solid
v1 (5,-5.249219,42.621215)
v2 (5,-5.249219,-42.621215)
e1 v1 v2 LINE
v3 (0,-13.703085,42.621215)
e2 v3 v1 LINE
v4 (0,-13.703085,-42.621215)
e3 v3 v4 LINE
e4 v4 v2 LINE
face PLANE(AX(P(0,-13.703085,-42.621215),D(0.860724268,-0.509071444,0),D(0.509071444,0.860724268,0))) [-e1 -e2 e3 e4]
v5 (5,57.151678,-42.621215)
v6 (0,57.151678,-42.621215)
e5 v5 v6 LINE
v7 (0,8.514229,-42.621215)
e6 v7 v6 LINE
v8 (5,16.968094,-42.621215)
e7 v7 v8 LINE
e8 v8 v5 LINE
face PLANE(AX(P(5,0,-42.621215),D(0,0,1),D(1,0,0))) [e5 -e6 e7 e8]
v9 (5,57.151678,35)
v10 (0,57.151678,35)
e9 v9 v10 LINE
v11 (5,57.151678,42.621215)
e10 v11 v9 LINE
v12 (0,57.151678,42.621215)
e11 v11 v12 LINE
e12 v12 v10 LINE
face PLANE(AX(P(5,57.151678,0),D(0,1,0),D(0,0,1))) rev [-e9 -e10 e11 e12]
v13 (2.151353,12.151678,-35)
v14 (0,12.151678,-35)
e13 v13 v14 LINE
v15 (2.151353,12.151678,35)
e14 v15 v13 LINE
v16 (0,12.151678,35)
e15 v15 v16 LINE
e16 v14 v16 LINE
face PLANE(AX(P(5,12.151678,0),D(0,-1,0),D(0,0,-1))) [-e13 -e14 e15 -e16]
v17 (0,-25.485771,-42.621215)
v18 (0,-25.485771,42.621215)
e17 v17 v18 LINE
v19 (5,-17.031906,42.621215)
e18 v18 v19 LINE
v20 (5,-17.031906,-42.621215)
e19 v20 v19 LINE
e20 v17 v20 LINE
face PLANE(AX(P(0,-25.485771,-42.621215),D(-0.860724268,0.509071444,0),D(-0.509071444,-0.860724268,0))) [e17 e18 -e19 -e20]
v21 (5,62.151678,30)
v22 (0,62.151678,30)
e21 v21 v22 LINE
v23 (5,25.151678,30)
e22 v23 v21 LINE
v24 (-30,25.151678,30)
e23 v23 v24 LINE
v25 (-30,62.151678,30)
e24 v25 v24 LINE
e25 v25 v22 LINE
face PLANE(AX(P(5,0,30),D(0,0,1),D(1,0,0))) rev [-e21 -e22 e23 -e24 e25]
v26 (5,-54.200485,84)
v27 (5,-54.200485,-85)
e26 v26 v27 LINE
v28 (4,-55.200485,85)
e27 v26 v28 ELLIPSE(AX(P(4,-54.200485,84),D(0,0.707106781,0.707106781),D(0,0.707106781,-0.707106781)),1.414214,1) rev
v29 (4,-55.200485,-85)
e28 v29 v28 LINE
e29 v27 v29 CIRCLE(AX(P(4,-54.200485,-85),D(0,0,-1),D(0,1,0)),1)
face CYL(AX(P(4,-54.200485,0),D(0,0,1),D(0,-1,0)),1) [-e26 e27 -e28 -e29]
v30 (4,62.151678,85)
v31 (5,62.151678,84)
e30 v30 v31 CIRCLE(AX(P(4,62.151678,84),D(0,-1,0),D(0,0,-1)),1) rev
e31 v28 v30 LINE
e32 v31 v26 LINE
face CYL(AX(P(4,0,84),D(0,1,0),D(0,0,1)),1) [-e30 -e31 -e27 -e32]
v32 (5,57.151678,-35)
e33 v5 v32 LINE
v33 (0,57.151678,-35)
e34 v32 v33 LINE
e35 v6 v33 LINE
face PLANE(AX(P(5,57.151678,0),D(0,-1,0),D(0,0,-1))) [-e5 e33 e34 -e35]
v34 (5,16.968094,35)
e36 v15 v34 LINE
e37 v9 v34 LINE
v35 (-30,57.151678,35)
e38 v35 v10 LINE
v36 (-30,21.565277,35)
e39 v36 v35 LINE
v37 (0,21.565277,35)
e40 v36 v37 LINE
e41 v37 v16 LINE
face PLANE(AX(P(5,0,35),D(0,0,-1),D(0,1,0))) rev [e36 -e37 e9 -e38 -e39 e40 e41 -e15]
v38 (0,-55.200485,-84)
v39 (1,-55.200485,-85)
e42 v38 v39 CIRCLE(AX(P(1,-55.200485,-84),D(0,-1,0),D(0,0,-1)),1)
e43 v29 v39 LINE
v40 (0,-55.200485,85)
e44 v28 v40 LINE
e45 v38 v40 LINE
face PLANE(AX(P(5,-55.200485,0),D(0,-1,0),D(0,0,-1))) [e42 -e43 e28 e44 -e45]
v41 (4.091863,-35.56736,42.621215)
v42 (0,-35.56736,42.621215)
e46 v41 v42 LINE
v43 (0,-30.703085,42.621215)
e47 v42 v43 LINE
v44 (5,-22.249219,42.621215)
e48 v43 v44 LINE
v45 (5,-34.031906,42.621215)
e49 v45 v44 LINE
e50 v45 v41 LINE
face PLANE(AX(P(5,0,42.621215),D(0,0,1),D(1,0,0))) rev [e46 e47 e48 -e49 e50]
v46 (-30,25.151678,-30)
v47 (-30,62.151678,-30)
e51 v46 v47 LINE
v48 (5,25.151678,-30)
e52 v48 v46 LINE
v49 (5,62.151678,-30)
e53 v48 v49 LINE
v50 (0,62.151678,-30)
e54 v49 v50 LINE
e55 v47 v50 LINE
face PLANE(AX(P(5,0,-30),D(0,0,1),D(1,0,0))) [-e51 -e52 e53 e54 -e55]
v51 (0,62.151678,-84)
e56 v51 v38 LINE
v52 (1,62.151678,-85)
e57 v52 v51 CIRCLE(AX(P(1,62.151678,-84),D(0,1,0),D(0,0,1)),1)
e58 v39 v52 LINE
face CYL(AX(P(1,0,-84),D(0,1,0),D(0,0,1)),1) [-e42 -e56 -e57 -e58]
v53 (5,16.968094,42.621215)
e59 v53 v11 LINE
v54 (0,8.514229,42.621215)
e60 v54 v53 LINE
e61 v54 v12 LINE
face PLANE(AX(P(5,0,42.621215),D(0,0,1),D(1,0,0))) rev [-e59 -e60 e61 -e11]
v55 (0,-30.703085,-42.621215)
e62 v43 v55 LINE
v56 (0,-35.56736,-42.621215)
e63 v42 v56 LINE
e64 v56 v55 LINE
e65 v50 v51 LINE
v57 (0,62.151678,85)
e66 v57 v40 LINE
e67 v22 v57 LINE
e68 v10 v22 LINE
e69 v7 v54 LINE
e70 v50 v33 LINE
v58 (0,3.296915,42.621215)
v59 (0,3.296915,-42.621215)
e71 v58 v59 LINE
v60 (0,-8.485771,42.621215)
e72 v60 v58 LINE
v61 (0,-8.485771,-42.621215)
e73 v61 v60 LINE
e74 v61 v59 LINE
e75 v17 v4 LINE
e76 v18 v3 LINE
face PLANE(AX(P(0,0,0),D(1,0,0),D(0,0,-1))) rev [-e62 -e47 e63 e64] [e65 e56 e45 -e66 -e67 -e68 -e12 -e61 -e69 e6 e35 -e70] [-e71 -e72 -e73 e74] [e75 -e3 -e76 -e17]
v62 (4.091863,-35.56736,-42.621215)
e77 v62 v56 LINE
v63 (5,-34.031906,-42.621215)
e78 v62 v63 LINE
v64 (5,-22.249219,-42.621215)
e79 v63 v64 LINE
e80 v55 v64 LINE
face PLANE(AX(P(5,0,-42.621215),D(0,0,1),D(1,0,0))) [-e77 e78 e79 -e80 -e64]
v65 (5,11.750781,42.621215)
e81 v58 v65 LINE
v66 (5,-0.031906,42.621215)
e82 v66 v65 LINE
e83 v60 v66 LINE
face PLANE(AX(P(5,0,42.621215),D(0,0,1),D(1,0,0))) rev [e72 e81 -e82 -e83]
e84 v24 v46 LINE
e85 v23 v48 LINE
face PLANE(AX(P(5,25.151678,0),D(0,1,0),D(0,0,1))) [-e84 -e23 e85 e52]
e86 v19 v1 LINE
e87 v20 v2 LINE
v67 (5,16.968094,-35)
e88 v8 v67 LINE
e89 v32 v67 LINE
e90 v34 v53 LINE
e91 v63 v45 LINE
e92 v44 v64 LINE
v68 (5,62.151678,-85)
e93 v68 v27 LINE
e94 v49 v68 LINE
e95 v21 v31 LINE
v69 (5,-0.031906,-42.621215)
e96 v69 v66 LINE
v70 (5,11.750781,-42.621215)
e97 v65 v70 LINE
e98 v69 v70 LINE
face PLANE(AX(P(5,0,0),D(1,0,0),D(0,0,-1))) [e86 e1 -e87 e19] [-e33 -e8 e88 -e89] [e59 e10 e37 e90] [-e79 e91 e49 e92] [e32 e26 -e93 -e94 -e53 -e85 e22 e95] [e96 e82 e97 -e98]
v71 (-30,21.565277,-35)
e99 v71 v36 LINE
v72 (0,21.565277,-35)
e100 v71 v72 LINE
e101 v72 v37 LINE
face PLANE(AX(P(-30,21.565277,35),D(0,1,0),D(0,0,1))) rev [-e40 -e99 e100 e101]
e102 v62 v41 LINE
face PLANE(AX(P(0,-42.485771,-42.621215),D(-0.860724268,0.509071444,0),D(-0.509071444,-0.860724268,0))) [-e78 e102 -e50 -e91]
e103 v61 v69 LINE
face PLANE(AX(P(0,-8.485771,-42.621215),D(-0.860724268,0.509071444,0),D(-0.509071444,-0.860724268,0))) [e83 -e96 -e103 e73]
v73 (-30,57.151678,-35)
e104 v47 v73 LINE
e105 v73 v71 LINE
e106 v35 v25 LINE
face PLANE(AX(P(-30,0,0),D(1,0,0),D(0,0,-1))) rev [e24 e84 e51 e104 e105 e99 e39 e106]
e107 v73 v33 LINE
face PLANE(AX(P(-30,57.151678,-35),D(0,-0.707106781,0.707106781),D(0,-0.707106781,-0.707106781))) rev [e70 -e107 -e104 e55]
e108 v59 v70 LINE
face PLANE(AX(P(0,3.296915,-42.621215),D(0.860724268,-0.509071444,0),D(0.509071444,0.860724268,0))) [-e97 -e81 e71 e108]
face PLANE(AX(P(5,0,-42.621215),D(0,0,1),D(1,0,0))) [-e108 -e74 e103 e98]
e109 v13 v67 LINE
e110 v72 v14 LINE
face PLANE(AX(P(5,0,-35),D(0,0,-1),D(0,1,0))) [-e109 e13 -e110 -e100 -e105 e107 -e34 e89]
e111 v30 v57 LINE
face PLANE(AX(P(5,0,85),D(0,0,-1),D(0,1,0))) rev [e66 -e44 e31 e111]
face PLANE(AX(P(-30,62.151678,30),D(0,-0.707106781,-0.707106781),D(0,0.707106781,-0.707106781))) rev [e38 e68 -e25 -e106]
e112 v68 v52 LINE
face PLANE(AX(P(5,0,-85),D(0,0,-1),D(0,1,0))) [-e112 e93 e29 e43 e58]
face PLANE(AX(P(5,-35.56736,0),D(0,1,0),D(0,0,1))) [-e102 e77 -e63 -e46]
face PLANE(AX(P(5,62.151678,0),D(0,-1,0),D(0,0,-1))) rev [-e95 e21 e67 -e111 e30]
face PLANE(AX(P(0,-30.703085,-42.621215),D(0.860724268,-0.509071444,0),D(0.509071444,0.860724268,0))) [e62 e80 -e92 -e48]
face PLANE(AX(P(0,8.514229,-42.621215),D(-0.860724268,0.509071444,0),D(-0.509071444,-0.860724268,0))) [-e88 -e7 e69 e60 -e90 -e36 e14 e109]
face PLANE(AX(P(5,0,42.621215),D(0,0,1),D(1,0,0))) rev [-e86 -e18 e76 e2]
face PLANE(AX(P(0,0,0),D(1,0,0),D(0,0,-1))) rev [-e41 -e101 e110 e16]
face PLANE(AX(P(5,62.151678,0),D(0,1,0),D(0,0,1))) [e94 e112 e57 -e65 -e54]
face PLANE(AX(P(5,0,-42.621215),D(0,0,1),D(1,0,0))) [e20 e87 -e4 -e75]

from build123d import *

# Parameters (mm, degrees)
BOSS_EXTRU_3_DEPTH             = 5
ESQUISSE6_W                    = 85.242430228
ESQUISSE6_H                    = 5.217313119
R_P_TITION_LIN_AIRE1_COUNT     = 3
R_P_TITION_LIN_AIRE1_PITCH     = 17
R_P_TITION_LIN_AIRE1_COL_COUNT = 2
R_P_TITION_LIN_AIRE1_COL_PITCH = 17
CONG_1_R                       = 1
BOSS_EXTRU_5_DEPTH             = 30


with BuildPart() as part:
    # Esquisse2 → Boss.-Extru.3 (new body)
    with BuildSketch(Plane(origin=(0, 0, 0), x_dir=(0, 0, -1), z_dir=(1, 0, 0))):
        Polygon((85, 62.151677918), (30, 62.151677918), (30, 25.151677918), (0, 25.151677918), (0, 12.151677918), (35, 12.151677918), (35, 57.151677918), (42.621215114, 57.151677918), (42.621215114, -35.567359792), (0, -35.567359792), (0, -55.200485129), (85, -55.200485129), align=None)
    boss_extru_3 = extrude(amount=BOSS_EXTRU_3_DEPTH)

    # Symétrie1: Boss.-Extru.3 across plane
    add(boss_extru_3.mirror(Plane.XY))

    # Balayage5: sweep along a path in Esquisse5
    with BuildLine(Plane.XY.offset(-42.621215114)) as balayage5_path:
        Line((0, -30.703084538), (5, -22.249219394))
    # Esquisse6 → Balayage5 (sweep)
    with BuildSketch(Plane(origin=(0, 0, 0), x_dir=(0, 0, -1), z_dir=(1, 0, 0))):
        with Locations((0, -28.094427979)):
            Rectangle(ESQUISSE6_W, ESQUISSE6_H)
    balayage5 = sweep(path=balayage5_path.line)

    # Répétition linéaire1: Balayage5 ×3
    with Locations(*[(0, i * R_P_TITION_LIN_AIRE1_PITCH, 0) for i in range(1, R_P_TITION_LIN_AIRE1_COUNT)]):
        add(balayage5)

    # Répétition linéaire1 col: Balayage5 ×2
    with Locations(*[(0, -i * R_P_TITION_LIN_AIRE1_COL_PITCH, 0) for i in range(1, R_P_TITION_LIN_AIRE1_COL_COUNT)]):
        add(balayage5)

    # Congé1
    cong_1_edges = [part.edges().sort_by_distance(p)[0] for p in [
        (0, 3.475596394, -85),
        (5, -55.200485129, 0),
        (5, 3.475596394, 85),
    ]]
    fillet(cong_1_edges, radius=CONG_1_R)

    # Esquisse8 → Boss.-Extru.5 (add)
    with BuildSketch(Plane.ZY):
        Polygon((-30, 62.151677918), (-30, 25.151677918), (30, 25.151677918), (30, 62.151677918), (35, 57.151677918), (35, 21.565276585), (-35, 21.565276585), (-35, 57.151677918), align=None)
    extrude(amount=BOSS_EXTRU_5_DEPTH)


solid = part.part
